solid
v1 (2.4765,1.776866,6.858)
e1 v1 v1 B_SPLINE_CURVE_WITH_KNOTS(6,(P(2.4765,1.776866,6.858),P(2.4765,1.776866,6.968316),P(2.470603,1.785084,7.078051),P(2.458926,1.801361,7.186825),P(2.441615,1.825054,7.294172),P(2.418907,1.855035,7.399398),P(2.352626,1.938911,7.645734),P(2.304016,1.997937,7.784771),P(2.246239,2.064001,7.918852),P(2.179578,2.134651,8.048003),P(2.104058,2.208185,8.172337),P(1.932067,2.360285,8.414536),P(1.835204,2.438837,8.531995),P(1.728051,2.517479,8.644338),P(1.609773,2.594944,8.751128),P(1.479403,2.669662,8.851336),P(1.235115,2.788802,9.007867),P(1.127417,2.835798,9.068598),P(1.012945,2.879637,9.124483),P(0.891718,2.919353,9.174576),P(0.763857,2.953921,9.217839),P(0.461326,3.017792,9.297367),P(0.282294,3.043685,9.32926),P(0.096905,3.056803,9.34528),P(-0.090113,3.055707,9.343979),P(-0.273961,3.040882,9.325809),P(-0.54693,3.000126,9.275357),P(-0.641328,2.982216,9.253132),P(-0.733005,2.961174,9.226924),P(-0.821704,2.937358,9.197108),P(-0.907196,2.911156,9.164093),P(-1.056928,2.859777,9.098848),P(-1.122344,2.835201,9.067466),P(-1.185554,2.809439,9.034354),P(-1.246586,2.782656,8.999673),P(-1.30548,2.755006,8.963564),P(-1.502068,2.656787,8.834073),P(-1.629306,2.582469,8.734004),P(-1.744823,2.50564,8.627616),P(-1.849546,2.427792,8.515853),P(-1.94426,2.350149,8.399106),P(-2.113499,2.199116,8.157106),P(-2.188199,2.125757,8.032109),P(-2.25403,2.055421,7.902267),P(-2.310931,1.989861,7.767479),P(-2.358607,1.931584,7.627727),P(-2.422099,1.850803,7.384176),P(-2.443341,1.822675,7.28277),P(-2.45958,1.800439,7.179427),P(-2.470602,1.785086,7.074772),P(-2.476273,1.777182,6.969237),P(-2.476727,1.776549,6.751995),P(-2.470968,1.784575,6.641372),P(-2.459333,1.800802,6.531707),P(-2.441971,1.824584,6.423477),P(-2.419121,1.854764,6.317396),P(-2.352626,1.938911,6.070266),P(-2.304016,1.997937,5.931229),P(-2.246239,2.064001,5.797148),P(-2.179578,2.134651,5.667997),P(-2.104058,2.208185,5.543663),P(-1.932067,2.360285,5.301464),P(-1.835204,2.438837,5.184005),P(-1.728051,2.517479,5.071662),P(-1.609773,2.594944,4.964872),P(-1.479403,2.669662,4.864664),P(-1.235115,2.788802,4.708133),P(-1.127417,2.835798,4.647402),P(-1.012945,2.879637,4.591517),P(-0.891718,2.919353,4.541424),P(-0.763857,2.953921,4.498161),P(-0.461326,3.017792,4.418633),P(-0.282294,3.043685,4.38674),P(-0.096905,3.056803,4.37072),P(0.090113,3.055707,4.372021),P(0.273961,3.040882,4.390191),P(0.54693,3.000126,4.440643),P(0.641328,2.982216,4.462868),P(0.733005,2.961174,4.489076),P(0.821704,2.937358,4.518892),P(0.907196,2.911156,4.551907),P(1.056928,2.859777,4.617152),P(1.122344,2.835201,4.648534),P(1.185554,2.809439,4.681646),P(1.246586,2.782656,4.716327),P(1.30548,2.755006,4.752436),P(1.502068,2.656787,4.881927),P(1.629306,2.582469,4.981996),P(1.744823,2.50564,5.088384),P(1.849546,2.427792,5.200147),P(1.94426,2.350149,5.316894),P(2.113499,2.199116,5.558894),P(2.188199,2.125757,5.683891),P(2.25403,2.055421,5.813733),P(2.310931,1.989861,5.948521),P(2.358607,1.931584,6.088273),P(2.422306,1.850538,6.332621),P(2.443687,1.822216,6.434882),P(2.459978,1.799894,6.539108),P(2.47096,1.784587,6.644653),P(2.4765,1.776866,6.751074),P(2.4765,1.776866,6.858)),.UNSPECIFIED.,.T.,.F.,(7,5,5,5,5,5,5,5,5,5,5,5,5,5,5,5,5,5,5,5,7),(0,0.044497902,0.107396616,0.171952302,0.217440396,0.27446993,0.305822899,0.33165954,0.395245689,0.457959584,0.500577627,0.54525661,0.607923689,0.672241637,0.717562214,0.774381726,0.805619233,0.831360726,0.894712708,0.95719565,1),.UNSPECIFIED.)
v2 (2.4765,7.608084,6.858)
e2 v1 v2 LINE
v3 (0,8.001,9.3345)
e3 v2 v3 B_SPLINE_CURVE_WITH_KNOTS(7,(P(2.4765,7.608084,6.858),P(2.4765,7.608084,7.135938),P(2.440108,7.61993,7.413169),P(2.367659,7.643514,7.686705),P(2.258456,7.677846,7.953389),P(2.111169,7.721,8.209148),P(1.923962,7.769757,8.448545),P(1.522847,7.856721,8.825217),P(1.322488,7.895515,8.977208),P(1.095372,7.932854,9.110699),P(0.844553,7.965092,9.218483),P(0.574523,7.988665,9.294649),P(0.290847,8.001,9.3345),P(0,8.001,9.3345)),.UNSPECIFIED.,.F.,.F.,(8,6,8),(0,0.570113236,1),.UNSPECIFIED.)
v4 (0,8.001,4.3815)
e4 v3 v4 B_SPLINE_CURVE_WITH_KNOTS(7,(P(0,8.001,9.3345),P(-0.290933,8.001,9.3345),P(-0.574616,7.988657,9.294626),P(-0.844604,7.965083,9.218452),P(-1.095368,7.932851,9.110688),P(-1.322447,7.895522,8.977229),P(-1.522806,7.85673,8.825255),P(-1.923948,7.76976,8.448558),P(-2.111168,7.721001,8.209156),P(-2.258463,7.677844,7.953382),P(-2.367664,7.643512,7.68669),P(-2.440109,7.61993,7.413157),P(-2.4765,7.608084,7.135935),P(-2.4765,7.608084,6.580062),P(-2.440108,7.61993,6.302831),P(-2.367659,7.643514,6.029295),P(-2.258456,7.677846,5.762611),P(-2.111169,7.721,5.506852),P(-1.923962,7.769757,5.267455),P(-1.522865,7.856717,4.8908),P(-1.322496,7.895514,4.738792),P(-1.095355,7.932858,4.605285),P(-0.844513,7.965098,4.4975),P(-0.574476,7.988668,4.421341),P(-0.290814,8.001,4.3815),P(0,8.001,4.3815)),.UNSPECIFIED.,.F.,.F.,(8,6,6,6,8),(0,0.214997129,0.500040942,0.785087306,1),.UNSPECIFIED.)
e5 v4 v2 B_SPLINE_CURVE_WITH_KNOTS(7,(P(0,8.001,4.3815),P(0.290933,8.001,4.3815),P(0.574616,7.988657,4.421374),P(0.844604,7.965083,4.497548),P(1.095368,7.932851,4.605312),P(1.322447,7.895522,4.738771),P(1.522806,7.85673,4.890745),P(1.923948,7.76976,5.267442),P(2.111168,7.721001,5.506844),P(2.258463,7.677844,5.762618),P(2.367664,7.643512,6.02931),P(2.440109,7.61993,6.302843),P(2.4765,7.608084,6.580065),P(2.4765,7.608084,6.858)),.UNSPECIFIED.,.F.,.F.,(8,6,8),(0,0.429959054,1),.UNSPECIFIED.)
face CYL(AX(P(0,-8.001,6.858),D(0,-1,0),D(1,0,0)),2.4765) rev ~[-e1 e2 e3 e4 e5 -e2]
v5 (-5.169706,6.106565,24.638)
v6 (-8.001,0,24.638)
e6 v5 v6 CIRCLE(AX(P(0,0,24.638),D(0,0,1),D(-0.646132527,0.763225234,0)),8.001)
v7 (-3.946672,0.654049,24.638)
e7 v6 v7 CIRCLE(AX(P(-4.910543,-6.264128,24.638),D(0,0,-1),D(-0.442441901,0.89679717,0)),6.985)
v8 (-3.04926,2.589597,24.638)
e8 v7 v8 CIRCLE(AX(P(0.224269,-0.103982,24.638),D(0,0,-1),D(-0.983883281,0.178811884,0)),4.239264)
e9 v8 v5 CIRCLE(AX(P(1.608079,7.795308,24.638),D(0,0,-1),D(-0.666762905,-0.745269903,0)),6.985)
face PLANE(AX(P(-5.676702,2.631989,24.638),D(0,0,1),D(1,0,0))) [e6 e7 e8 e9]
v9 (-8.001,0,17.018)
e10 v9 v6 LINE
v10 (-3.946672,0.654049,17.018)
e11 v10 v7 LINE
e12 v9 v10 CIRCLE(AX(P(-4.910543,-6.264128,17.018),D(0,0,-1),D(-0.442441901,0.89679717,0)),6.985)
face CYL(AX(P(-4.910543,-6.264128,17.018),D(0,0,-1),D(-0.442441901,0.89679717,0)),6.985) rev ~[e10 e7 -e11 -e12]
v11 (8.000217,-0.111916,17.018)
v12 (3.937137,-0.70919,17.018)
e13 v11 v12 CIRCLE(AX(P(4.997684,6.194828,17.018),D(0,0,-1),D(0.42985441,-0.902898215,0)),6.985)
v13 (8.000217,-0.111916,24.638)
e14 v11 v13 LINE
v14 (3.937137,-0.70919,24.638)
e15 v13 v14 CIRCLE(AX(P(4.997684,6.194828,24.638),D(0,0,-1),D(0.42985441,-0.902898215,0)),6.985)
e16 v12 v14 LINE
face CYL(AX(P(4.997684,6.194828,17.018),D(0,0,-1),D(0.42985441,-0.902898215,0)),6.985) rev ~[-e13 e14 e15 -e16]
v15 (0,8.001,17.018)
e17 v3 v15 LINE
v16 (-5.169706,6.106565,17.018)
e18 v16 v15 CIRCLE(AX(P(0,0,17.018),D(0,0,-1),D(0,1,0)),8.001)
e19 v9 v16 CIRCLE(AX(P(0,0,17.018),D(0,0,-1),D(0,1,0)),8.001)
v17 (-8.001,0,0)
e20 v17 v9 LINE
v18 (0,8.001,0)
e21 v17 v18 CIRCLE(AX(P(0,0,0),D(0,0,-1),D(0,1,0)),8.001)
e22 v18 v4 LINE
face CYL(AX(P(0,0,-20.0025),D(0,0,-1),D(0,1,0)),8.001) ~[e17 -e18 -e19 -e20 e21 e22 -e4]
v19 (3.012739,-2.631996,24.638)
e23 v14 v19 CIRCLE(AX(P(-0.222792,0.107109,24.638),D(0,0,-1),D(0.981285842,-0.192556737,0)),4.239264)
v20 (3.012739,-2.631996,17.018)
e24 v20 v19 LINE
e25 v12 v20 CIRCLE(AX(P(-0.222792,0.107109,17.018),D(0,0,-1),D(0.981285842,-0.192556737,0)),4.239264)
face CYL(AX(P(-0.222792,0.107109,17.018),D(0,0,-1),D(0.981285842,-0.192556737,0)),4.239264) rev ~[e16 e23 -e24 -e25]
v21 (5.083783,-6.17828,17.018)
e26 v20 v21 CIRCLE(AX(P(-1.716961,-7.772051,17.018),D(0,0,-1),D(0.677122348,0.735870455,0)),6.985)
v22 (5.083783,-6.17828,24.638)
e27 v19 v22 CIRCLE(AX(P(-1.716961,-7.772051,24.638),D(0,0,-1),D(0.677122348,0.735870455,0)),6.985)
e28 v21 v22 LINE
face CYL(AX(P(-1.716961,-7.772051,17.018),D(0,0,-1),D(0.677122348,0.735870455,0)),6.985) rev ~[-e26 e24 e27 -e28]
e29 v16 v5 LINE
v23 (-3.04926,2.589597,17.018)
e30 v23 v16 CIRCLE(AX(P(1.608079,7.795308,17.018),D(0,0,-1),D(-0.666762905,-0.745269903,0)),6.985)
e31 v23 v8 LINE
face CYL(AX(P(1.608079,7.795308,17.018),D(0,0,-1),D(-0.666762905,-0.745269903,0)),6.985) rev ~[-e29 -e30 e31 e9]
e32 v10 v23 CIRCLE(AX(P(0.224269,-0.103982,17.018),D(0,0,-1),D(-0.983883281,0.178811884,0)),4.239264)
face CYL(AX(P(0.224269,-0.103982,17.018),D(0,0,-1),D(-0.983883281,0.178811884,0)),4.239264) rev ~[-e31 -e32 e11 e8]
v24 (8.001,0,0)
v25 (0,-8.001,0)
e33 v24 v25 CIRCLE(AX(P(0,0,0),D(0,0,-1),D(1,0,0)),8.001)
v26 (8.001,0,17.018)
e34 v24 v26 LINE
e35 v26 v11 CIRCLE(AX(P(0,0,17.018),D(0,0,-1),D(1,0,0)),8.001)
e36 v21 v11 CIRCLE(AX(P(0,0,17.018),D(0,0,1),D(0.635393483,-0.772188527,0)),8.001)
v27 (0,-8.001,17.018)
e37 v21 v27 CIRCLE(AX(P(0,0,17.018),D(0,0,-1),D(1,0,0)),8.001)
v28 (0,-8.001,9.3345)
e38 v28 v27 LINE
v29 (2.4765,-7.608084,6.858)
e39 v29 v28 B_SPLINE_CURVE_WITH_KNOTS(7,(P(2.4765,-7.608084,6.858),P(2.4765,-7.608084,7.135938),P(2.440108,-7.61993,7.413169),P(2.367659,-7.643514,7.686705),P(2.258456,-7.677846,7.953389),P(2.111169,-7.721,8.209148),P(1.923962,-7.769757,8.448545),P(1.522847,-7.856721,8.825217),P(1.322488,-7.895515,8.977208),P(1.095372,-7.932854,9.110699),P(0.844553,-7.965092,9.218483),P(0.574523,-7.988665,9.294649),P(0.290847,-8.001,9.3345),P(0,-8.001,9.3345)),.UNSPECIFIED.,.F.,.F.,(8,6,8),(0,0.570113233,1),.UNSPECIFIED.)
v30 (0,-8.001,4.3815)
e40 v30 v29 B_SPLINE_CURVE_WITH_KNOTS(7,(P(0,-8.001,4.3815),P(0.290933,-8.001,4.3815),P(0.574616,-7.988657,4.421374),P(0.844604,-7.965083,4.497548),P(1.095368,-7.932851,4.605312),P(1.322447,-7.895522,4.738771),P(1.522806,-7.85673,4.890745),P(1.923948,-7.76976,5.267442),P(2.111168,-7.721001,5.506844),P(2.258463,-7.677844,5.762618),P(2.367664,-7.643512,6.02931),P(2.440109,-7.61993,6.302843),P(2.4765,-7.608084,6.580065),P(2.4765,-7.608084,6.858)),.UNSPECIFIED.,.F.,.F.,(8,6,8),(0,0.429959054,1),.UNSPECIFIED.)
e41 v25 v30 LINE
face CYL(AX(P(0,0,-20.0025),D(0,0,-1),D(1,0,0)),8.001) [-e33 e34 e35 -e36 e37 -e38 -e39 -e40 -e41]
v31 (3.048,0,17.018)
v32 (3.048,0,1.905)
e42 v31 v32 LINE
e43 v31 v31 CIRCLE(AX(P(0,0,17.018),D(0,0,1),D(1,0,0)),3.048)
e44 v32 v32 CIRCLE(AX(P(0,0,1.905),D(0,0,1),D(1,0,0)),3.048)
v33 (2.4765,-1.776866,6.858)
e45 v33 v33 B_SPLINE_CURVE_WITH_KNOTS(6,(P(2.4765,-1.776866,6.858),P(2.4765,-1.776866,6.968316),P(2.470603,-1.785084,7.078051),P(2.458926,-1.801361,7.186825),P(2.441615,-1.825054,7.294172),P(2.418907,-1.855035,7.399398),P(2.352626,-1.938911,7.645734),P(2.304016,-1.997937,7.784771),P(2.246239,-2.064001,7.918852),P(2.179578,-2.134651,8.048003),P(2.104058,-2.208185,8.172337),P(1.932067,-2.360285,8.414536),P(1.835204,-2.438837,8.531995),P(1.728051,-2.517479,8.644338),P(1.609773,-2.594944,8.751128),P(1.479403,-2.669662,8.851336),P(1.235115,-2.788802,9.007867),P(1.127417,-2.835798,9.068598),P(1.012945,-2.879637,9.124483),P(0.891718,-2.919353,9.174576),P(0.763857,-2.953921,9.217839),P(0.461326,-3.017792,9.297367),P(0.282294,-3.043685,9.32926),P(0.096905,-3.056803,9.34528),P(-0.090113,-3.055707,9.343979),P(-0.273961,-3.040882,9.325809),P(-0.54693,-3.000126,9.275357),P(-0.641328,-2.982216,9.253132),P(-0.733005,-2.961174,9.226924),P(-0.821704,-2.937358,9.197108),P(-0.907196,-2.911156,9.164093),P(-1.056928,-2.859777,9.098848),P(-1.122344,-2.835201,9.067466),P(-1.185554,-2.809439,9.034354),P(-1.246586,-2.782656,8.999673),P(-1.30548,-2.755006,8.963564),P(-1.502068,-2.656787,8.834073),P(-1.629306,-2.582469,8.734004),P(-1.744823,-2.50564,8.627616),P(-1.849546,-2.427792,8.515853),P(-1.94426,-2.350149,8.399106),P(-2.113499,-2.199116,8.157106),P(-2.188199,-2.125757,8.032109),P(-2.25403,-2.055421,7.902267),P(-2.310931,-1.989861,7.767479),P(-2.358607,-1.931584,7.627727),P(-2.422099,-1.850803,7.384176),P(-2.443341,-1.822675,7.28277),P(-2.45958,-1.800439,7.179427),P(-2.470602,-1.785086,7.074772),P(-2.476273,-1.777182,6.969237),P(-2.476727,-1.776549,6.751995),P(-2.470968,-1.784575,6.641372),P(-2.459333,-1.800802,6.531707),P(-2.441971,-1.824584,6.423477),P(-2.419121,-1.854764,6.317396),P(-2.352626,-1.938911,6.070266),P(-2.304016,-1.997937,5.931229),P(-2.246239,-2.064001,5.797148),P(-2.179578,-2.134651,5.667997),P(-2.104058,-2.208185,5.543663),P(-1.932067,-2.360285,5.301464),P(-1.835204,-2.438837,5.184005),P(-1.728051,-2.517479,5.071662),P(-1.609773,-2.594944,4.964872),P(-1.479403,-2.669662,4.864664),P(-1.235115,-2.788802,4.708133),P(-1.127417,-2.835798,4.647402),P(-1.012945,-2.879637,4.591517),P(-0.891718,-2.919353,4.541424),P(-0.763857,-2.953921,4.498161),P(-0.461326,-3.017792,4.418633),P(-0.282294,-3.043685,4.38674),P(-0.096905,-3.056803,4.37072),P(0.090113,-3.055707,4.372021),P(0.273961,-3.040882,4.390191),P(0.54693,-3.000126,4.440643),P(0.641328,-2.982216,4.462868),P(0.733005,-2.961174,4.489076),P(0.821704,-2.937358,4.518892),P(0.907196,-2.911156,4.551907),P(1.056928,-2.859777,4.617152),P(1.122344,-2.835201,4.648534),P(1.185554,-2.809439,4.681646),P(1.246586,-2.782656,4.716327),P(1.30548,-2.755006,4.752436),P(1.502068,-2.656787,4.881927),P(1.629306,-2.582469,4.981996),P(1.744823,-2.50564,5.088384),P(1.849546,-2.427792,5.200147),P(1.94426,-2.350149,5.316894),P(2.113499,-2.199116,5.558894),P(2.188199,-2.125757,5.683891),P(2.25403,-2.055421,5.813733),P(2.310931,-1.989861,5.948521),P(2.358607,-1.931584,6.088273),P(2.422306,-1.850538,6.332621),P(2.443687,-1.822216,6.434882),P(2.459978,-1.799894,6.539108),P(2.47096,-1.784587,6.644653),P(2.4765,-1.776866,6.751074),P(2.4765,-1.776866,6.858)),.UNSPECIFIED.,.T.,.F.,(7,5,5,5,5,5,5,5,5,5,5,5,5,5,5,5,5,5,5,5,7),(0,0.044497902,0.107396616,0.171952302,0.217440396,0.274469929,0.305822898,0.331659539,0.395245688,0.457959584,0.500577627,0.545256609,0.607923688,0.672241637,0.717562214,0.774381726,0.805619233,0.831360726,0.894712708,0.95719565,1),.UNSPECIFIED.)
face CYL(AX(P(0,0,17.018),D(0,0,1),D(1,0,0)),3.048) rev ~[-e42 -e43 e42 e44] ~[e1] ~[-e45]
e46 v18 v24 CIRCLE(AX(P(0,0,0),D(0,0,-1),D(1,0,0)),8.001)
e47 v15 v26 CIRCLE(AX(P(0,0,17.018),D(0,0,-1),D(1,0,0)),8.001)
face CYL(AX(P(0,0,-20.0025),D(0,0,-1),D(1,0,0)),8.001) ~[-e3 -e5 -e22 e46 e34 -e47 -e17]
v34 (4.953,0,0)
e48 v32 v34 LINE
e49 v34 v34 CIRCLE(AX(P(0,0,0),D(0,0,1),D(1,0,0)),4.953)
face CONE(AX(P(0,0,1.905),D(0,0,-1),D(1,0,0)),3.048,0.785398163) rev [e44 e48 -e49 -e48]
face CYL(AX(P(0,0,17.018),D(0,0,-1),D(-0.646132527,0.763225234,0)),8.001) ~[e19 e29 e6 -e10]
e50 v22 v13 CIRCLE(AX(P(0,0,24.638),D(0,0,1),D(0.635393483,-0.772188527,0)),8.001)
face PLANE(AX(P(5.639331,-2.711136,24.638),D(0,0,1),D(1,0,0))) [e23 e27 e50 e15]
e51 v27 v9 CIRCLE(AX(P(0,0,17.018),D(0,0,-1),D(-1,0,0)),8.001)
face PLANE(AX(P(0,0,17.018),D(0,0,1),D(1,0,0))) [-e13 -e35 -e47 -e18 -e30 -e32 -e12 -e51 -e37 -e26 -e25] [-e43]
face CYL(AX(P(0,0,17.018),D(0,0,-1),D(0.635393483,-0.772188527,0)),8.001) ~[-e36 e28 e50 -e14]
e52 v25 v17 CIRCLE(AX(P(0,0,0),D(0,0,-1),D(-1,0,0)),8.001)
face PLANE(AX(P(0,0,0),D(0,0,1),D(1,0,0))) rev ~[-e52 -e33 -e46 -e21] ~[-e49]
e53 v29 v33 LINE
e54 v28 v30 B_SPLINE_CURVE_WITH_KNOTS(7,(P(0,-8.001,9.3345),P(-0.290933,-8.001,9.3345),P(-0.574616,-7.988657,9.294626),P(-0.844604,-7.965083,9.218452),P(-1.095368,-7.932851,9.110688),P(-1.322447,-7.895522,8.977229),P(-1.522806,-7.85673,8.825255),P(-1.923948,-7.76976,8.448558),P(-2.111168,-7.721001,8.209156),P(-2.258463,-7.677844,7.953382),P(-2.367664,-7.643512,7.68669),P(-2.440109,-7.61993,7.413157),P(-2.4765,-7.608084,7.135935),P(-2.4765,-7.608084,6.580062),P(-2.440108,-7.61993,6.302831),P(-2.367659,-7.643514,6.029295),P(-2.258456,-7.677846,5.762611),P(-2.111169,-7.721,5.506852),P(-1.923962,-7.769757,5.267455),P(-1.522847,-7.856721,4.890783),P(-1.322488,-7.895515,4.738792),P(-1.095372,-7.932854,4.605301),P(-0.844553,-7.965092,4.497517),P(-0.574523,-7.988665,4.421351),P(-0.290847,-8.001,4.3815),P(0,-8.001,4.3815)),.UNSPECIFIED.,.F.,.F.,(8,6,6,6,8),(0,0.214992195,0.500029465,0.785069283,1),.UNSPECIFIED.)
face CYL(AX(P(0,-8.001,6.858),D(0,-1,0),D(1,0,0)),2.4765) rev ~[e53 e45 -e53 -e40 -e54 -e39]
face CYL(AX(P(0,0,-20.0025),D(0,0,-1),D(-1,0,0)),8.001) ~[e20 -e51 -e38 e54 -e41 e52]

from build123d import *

# Parameters (mm, degrees)
F0_R        = 8.001
F0_R_2      = 3.048
F1_DEPTH    = 17.018
F3_W        = 16.002
F3_H        = 16.002
F4_DEPTH    = 17.018
F5_R        = 2.4765
F6_DEPTH    = 25.4
F7_T1_DEPTH = 57.023
F2_R        = 3.048
F8_DEPTH    = 25.4
F10_DEPTH   = 7.62
F11_SIZE    = 1.905


# Not quite as in the source:
# - a fillet or chamfer that OpenCascade refuses, or shapes differently, is made with other operations: its cross-section is extruded or revolved along the edge and cut away or added


with BuildPart() as f1:
    # F0 (on Top) → F1 (new body)
    with BuildSketch(Plane.XY):
        Circle(F0_R)
        Circle(F0_R_2, mode=Mode.SUBTRACT)
    extrude(amount=F1_DEPTH)

    # F3 (on Top) → F4 (join)
    with BuildSketch(Plane.XY):
        Rectangle(F3_W, F3_H)
    extrude(amount=F4_DEPTH)

    # F5 (on face) → F6 (cut)
    with BuildSketch(Plane.XZ.offset(8.001)):
        with Locations((0, 6.858)):
            Circle(F5_R)
    extrude(amount=-F6_DEPTH, mode=Mode.SUBTRACT)

    # F7: fillet of radius 8.001 on 4 edges, made by hand

    # F7_s2 → F7_t1 (cut)
    with BuildSketch(Plane.XY.offset(-20.0025)):
        with BuildLine():
            ThreePointArc((8.001, 0), (5.6575613563, -5.6575613563), (0, -8.001))
            Line((0, -8.001), (8.001, -8.001))
            Line((8.001, -8.001), (8.001, 0))
        make_face()
        with BuildLine():
            ThreePointArc((8.001, 0), (5.6575613563, 5.6575613563), (0, 8.001))
            Line((0, 8.001), (8.001, 8.001))
            Line((8.001, 8.001), (8.001, 0))
        make_face()
        with BuildLine():
            ThreePointArc((-8.001, 0), (-5.6575613563, -5.6575613563), (0, -8.001))
            Line((0, -8.001), (-8.001, -8.001))
            Line((-8.001, -8.001), (-8.001, 0))
        make_face()
        with BuildLine():
            ThreePointArc((0, 8.001), (-5.6575613563, 5.6575613563), (-8.001, 0))
            Line((-8.001, 0), (-8.001, 8.001))
            Line((-8.001, 8.001), (0, 8.001))
        make_face()
    extrude(amount=F7_T1_DEPTH, mode=Mode.SUBTRACT)

    # F2 (on face) → F8 (cut)
    with BuildSketch(Plane.XY.offset(17.018)):
        Circle(F2_R)
    extrude(amount=-F8_DEPTH, mode=Mode.SUBTRACT)

    # F9 (on face) → F10 (join)
    with BuildSketch(Plane.XY.offset(17.018)):
        with BuildLine():
            ThreePointArc((-3.0492599206, 2.589597302), (-4.3737921452, 4.1887242953), (-5.1697063492, 6.1065650953))
            ThreePointArc((-5.1697063492, 6.1065650953), (-7.2587471887, 3.3655), (-8.001, 0))
            ThreePointArc((-8.001, 0), (-6.0229894511, 0.6317175182), (-3.9466720244, 0.6540490669))
            ThreePointArc((-3.9466720244, 0.6540490669), (-3.6217185151, 1.6792007416), (-3.0492599206, 2.589597302))
        make_face()
        with BuildLine():
            ThreePointArc((3.0127388708, -2.6319963424), (4.3147732675, -4.2494941582), (5.0837832604, -6.1782804049))
            ThreePointArc((5.0837832604, -6.1782804049), (7.2109611489, -3.4667045316), (8.0002172314, -0.1119162637))
            ThreePointArc((8.0002172314, -0.1119162637), (6.0135638704, -0.7159039933), (3.9371372089, -0.7091902765))
            ThreePointArc((3.9371372089, -0.7091902765), (3.5978758903, -1.729696277), (3.0127388708, -2.6319963424))
        make_face()
    extrude(amount=F10_DEPTH)

    # F11
    f11_edges = [f1.edges().sort_by_distance(p)[0] for p in [
        (-3.048, 0, 0),
    ]]
    chamfer(f11_edges, length=F11_SIZE)


solid = f1.part
